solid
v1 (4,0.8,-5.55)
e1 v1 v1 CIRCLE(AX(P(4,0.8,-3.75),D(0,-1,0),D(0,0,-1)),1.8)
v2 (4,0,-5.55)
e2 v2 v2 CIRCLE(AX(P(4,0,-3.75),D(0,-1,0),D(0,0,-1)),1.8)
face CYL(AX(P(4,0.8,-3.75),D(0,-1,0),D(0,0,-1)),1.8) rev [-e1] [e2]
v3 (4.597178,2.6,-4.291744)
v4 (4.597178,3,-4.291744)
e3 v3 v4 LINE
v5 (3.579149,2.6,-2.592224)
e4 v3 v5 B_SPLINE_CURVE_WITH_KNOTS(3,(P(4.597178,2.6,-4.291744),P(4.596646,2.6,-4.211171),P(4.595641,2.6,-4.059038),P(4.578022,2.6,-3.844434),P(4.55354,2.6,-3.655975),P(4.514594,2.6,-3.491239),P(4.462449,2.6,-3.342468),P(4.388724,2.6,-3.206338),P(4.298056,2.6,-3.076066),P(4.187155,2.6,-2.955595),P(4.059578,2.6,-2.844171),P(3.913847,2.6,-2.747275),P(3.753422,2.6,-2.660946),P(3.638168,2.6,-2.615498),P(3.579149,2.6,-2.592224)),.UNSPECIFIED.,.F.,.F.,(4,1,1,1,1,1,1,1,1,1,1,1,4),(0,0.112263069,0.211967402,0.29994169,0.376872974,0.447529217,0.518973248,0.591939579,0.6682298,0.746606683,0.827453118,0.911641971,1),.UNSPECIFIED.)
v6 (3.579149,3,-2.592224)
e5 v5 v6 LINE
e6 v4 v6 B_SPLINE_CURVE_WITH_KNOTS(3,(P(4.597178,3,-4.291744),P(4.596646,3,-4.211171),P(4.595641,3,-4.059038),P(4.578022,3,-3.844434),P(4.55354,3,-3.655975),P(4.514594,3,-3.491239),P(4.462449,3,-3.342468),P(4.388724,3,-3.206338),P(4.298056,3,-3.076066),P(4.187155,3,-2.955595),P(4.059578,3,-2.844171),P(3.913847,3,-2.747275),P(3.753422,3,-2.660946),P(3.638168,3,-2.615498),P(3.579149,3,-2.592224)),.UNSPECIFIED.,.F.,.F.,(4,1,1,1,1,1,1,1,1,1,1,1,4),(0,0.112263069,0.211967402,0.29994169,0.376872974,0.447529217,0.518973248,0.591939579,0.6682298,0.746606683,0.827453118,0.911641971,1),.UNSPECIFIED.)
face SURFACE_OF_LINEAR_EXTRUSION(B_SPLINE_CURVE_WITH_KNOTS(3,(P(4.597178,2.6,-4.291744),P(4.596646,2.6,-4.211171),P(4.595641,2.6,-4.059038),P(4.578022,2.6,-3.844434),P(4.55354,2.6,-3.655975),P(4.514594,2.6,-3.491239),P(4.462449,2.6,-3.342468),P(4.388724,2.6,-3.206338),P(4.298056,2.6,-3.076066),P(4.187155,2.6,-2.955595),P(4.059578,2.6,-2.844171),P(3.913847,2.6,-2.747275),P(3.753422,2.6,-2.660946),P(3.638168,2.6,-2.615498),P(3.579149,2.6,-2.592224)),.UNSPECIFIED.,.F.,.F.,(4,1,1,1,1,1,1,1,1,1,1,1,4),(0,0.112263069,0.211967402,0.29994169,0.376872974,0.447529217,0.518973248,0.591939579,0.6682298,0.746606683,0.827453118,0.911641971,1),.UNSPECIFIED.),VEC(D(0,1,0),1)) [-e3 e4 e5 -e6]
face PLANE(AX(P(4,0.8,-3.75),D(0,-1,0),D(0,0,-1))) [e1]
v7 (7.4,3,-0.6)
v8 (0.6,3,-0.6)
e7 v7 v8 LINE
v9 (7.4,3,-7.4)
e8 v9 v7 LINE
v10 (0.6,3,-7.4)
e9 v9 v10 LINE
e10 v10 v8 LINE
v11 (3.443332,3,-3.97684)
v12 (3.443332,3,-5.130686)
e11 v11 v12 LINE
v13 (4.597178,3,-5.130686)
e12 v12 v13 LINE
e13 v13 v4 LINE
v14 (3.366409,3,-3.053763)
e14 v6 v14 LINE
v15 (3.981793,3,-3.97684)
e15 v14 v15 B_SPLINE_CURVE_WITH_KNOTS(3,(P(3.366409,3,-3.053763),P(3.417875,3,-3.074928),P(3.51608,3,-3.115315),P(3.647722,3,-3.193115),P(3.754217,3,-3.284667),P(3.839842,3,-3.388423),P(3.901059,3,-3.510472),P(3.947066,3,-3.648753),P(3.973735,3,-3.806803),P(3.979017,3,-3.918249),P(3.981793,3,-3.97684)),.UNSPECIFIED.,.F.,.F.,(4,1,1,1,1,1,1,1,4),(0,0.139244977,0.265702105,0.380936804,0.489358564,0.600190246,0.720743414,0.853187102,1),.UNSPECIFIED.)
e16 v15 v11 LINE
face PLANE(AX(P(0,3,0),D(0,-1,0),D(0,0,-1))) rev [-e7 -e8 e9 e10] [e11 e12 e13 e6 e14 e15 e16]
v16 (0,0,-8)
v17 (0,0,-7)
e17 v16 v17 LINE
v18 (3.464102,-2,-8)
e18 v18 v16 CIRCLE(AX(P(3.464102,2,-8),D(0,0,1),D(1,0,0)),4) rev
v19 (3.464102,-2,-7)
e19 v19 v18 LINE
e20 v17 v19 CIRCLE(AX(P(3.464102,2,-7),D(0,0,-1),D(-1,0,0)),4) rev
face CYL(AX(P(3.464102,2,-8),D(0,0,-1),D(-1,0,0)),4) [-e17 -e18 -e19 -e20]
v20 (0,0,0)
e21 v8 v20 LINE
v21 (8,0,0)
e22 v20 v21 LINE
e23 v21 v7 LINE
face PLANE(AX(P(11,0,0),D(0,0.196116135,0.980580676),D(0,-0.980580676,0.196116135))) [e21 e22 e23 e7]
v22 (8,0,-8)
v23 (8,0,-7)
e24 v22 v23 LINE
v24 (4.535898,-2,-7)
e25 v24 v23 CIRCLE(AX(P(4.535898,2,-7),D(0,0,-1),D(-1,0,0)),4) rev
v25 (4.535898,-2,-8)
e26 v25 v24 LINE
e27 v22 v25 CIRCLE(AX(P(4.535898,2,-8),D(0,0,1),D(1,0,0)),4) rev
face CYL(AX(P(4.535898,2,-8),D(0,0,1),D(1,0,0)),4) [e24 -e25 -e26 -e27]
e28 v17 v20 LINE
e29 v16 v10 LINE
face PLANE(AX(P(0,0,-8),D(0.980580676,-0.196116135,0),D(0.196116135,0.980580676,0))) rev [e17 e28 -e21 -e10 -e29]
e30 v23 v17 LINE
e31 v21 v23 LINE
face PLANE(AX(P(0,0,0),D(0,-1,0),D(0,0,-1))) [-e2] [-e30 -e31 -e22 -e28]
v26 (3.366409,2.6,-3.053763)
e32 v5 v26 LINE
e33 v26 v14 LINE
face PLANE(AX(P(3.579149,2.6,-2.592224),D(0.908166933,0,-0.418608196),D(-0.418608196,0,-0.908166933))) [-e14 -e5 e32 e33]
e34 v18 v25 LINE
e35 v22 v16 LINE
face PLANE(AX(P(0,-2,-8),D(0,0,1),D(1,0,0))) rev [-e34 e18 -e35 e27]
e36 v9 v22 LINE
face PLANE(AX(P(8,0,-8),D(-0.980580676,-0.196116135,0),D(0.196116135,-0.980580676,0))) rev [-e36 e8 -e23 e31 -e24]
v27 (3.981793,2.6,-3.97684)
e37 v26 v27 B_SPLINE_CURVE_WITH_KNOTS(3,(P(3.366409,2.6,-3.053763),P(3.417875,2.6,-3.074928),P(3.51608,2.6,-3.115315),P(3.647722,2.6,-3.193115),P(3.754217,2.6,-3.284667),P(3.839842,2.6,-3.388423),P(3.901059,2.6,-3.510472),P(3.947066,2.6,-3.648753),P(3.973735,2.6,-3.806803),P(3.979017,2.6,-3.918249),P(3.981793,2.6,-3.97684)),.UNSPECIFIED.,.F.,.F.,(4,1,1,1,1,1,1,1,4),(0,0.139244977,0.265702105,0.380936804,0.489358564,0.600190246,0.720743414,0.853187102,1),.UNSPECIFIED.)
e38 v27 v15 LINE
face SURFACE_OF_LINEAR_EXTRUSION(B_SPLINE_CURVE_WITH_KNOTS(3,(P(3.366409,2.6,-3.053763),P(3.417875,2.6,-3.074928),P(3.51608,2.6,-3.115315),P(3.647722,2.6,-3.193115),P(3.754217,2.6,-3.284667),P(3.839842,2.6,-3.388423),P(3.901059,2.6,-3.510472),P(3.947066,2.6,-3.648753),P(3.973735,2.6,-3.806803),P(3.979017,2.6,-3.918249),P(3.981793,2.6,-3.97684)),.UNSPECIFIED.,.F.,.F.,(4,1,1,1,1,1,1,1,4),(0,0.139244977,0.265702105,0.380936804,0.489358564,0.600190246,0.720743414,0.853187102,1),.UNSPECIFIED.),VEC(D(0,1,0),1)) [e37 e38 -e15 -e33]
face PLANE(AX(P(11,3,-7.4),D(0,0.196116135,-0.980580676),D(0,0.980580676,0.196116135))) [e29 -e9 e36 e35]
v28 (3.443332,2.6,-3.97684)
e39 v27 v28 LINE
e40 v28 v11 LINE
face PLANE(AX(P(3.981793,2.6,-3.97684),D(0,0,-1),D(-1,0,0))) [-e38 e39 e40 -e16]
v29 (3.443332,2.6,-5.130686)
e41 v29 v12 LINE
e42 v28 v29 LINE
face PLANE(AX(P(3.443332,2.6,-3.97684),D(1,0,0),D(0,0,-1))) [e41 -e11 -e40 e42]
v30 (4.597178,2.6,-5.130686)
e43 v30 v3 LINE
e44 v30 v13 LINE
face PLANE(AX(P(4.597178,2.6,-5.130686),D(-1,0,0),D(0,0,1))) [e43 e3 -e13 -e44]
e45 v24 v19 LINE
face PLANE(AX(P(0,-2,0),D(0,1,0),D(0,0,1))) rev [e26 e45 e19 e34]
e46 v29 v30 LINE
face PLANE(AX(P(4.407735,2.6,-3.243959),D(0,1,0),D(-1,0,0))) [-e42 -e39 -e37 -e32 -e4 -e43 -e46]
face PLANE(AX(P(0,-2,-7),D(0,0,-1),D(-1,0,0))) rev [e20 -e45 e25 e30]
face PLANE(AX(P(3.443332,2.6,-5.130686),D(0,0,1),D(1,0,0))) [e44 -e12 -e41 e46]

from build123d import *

# Parameters (mm, degrees)
SKETCH1_W               = 8
SKETCH1_H               = 8
BOSS_EXTRUDE1_DEPTH     = 3
CUT_EXTRUDE1_DEPTH      = 12.704699911
CUT_EXTRUDE1_DEPTH_BACK = 12.704699911
CUT_EXTRUDE2_DEPTH      = 11
SKETCH4_R               = 1.8
CUT_EXTRUDE3_DEPTH      = 0.8
SKETCH5_W               = 8
SKETCH5_H               = 1
BOSS_EXTRUDE2_DEPTH     = 2
FILLET1_R               = 4
CUT_EXTRUDE4_DEPTH      = 0.4


with BuildPart() as part:
    # Sketch1 → Boss-Extrude1 (new body)
    with BuildSketch(Plane(origin=(0, 0, 0), x_dir=(1, 0, 0), z_dir=(0, 1, 0))):
        with Locations((4, 4)):
            Rectangle(SKETCH1_W, SKETCH1_H)
    extrude(amount=BOSS_EXTRUDE1_DEPTH)

    # Sketch2 → Cut-Extrude1 (cut, two sides: drawn at the far end of the back side and taken through both)
    with BuildSketch(Plane.XY.offset(-CUT_EXTRUDE1_DEPTH_BACK)):
        Polygon((0, 0), (0.6, 3), (0, 3), align=None)
        Polygon((8, 0), (7.4, 3), (8, 3), align=None)
    extrude(amount=CUT_EXTRUDE1_DEPTH + CUT_EXTRUDE1_DEPTH_BACK, mode=Mode.SUBTRACT)

    # Sketch3 → Cut-Extrude2 (cut)
    with BuildSketch(Plane(origin=(0, 0, 0), x_dir=(0, 0, -1), z_dir=(1, 0, 0))):
        Polygon((0, 0), (0.6, 3), (0, 3), align=None)
        Polygon((8, 3), (7.4, 3), (8, 0), align=None)
    extrude(amount=CUT_EXTRUDE2_DEPTH, mode=Mode.SUBTRACT)

    # Sketch4 → Cut-Extrude3 (cut)
    with BuildSketch(Plane.XZ):
        with Locations(Location((4, -3.75, 0), (0, 0, 270))):
            Circle(SKETCH4_R)
    extrude(amount=-CUT_EXTRUDE3_DEPTH, mode=Mode.SUBTRACT)

    # Sketch5 → Boss-Extrude2 (add)
    with BuildSketch(Plane.XZ):
        with Locations((4, -7.5)):
            Rectangle(SKETCH5_W, SKETCH5_H)
    extrude(amount=BOSS_EXTRUDE2_DEPTH)

    # Fillet1
    # the kernel refuses this fillet: 4 mm, written as the material it takes off along each edge
    with BuildSketch(Plane(origin=(8, -2, -16.660254038), x_dir=(0, 1, 0), z_dir=(0, 0, 1)), Plane(origin=(0, -2, 1.660254038), x_dir=(0, 1, 0), z_dir=(0, 0, -1))) as fillet1_piece_1:
        with BuildLine():
            CenterArc((4, 3.464101615), FILLET1_R, 180, 60)
            Line((0, 3.464101615), (-0.08, 3.464101615))
            Line((-0.08, 3.464101615), (-0.08, 0))
            Line((-0.08, 0), (0, -0.08))
            ThreePointArc((0, -0.08), (1, -0.08), (1.96, -0.069282032))
            Line((1.96, -0.069282032), (2, 0))
        make_face()
    extrude(amount=18.320508076, mode=Mode.SUBTRACT)

    # Sketch6 → Cut-Extrude4 (cut)
    with BuildSketch(Plane(origin=(0, 3, 0), x_dir=(1, 0, 0), z_dir=(0, 1, 0))):
        with BuildLine():
            Line((3.443331895, 5.130686034), (4.597178049, 5.130686034))
            Line((4.597178049, 5.130686034), (4.597178049, 4.291743727))
            add(Edge.make_bspline(
                [(4.597178049, 4.291743727), (4.596645702, 4.211170655), (4.595640561, 4.059038126), (4.578021597, 3.844434295), (4.553540207, 3.655975372), (4.51459395, 3.491238943), (4.462448704, 3.342468302), (4.388723742, 3.206338125), (4.298056147, 3.076066307), (4.187154731, 2.955594738), (4.059577941, 2.844170634), (3.913847481, 2.747275335), (3.753421756, 2.660946408), (3.638168327, 2.615497851), (3.579149203, 2.592224496)],
                knots=[0, 0, 0, 0, 1.347156832, 2.543608823, 3.599300285, 4.522475688, 5.370350604, 6.227678973, 7.103274953, 8.018757603, 8.959280198, 9.929437417, 10.939703653, 12, 12, 12, 12], degree=3))
            Line((3.579149203, 2.592224496), (3.366408818, 3.053762957))
            add(Edge.make_bspline(
                [(3.366408818, 3.053762957), (3.417874874, 3.07492834), (3.516080495, 3.11531534), (3.647721841, 3.193115232), (3.754216523, 3.284666717), (3.839841548, 3.388423011), (3.901059293, 3.510472084), (3.947065575, 3.648752862), (3.973734578, 3.806802537), (3.979016553, 3.918249261), (3.981793434, 3.976839881)],
                knots=[0, 0, 0, 0, 1.113959817, 2.125616841, 3.047494432, 3.914868512, 4.801521967, 5.765947312, 6.825496818, 8, 8, 8, 8], degree=3))
            Line((3.981793434, 3.976839881), (3.443331895, 3.976839881))
            Line((3.443331895, 3.976839881), (3.443331895, 5.130686034))
        make_face()
    extrude(amount=-CUT_EXTRUDE4_DEPTH, mode=Mode.SUBTRACT)


solid = part.part
